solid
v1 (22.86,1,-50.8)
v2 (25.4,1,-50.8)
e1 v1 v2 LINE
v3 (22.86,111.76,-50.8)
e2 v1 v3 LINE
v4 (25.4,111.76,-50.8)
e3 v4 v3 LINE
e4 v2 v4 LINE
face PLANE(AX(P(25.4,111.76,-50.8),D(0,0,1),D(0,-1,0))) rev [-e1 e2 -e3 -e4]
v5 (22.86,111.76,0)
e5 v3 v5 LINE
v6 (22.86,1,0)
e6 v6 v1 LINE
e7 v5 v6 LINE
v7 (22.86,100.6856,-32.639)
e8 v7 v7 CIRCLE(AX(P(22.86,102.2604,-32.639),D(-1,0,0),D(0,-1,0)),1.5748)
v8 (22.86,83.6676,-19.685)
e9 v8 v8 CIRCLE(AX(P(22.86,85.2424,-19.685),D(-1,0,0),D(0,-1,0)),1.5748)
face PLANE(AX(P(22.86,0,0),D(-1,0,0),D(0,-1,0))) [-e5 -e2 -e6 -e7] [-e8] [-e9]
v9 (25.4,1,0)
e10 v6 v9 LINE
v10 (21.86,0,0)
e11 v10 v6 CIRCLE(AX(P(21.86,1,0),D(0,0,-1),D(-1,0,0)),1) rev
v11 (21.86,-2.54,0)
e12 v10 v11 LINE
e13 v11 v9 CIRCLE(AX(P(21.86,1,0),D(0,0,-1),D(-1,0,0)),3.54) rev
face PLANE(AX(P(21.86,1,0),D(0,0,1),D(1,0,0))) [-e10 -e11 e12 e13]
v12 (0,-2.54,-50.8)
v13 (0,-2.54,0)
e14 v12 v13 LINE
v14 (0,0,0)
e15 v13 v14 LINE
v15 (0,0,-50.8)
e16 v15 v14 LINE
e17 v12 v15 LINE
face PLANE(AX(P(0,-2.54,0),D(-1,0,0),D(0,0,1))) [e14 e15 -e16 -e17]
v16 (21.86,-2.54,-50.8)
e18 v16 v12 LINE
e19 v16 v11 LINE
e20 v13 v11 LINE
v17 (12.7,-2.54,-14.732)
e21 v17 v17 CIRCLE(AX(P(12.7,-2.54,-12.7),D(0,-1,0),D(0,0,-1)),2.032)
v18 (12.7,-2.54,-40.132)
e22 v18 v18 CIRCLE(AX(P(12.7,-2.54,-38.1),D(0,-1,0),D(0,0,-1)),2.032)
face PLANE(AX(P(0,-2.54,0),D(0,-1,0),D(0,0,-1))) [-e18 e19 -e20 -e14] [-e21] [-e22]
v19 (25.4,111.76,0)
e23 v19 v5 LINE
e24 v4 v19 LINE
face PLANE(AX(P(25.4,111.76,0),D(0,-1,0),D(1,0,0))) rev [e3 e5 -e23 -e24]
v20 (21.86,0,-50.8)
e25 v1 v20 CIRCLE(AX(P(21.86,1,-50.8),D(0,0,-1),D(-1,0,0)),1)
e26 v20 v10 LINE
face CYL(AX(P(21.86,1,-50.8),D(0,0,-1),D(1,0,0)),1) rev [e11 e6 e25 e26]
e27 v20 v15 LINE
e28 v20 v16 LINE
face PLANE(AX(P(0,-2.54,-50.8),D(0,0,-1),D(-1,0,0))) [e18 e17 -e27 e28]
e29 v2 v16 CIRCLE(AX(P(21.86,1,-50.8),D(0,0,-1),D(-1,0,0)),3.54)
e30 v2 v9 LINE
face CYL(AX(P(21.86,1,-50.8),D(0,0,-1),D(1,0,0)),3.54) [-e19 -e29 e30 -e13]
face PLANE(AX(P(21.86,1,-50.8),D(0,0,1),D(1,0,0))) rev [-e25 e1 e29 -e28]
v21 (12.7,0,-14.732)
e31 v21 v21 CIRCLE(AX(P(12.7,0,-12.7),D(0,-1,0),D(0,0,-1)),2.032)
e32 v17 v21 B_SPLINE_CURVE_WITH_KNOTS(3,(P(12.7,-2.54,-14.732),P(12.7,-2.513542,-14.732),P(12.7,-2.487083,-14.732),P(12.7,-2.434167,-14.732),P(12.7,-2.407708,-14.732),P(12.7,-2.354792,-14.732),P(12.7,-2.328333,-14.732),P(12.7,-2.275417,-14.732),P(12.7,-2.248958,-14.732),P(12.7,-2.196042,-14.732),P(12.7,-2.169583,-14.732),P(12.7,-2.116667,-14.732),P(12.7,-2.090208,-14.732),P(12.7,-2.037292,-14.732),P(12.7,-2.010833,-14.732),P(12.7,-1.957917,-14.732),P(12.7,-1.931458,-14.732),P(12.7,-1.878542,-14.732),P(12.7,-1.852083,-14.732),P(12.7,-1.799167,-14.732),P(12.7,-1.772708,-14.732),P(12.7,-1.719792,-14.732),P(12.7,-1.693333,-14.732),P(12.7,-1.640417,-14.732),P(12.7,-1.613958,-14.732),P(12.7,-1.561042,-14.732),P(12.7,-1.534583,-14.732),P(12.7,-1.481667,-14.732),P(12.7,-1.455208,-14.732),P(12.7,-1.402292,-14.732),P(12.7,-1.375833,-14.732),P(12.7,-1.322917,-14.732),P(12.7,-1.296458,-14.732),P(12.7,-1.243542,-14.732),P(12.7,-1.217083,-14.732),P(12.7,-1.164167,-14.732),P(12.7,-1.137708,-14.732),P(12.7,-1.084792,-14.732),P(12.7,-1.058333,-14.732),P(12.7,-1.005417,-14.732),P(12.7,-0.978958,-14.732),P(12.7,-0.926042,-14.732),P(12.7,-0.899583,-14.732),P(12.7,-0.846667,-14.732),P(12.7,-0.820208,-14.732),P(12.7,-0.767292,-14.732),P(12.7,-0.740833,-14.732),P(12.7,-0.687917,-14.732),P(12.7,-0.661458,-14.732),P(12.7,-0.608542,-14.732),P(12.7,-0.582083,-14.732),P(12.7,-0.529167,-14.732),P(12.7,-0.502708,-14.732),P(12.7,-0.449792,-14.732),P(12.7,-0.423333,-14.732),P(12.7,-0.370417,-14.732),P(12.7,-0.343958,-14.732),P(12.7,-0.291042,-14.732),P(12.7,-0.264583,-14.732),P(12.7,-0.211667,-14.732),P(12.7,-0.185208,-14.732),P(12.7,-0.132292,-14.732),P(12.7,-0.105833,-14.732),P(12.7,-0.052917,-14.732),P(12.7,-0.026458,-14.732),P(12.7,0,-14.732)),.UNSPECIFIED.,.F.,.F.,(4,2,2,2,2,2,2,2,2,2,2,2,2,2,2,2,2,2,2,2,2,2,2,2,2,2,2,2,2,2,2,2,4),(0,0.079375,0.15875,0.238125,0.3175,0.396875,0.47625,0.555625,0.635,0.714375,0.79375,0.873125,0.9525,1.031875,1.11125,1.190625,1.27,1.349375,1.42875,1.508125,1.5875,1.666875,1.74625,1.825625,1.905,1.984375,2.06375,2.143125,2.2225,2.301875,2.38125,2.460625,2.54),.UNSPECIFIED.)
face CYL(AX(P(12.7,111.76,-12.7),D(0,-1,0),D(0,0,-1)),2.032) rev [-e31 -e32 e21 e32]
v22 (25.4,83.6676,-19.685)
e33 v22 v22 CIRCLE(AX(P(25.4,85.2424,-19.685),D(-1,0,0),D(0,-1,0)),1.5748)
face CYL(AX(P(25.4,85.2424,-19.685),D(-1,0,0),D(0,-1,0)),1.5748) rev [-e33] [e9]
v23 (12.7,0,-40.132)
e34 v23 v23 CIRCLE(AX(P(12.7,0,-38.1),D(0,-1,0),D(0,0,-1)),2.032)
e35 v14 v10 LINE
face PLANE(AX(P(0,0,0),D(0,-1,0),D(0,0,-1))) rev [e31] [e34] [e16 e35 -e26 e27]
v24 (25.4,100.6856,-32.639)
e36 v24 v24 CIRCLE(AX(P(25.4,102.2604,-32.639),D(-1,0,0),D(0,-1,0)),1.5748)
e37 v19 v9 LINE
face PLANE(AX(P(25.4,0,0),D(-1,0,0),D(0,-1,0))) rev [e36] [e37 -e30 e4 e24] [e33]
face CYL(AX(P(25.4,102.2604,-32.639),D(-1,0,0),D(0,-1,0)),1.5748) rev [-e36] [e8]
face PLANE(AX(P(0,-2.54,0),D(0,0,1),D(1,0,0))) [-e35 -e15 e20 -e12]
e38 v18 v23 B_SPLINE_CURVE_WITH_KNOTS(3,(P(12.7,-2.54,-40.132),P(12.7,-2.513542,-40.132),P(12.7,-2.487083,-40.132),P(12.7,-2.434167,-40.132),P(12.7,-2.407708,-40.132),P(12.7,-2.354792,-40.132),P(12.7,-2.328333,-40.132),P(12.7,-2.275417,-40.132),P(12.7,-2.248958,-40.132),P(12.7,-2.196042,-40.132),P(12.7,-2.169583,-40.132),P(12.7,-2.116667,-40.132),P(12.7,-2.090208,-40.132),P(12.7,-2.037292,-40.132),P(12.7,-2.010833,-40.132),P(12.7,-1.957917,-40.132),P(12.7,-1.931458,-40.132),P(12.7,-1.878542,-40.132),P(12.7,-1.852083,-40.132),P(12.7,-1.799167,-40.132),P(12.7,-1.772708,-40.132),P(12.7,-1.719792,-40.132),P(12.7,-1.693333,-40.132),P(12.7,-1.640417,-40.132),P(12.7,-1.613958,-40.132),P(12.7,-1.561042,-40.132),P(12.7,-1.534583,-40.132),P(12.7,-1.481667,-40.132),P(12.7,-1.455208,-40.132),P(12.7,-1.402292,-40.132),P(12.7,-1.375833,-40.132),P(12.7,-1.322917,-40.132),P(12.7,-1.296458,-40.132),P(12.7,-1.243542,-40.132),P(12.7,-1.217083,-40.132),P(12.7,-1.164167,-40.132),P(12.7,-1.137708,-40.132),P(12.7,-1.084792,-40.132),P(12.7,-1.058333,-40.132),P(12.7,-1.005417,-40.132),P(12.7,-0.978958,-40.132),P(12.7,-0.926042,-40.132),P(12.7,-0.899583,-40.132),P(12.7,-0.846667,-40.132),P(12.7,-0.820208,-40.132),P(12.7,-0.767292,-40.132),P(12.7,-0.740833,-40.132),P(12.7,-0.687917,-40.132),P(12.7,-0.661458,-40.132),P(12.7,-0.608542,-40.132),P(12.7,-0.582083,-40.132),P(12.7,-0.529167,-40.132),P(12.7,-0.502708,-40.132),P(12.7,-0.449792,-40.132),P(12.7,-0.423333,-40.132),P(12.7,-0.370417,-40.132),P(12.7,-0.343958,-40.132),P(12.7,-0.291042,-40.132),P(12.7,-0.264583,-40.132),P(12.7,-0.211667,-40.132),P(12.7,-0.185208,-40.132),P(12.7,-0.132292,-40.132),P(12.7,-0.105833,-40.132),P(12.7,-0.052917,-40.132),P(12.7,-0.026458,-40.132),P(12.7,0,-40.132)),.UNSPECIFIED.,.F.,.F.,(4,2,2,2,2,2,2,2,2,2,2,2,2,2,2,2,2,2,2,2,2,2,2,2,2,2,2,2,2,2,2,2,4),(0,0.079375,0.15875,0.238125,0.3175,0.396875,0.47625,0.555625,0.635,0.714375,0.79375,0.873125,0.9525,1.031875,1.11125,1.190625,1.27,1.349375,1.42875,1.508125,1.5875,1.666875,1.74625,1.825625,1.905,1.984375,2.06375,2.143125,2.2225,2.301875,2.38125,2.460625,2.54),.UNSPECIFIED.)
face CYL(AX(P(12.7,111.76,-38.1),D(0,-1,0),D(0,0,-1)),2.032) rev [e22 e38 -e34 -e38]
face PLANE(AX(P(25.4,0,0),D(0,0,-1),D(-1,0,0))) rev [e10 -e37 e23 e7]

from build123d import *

# Parameters (mm, degrees)
SKETCH2_W                    = 25.4
SKETCH2_H                    = 50.8
BASE_FLANGE1_DEPTH           = 2.54
EDGE_FLANGE1_STRIP_W         = 12.16
EDGE_FLANGE1_STRIP_H         = 2.54
EDGE_FLANGE1_STRIP_CUT_DEPTH = 50.8
EDGE_FLANGE1_DEPTH           = 50.8
SKETCH10_R                   = 2.032
CUT_EXTRUDE1_DEPTH           = 128.633420388
SKETCH11_R                   = 1.5748
CUT_EXTRUDE2_DEPTH           = 125.874005301


# Sheet-metal steps are written as plain solids
with BuildPart() as part:
    # Sketch2 → Base-Flange1 (new body)
    with BuildSketch(Plane(origin=(0, 0, 0), x_dir=(1, 0, 0), z_dir=(0, 1, 0))):
        with Locations((12.7, 25.4)):
            Rectangle(SKETCH2_W, SKETCH2_H)
    extrude(amount=-BASE_FLANGE1_DEPTH)

    # Edge-Flange1 strip (across the edge) → Edge-Flange1 strip cut (cut)
    with BuildSketch(Plane(origin=(25.4, 0, 0), x_dir=(-1, 0, 0), z_dir=(0, 0, -1))):
        with Locations((-2.54, -1.27)):
            Rectangle(EDGE_FLANGE1_STRIP_W, EDGE_FLANGE1_STRIP_H)
    extrude(amount=EDGE_FLANGE1_STRIP_CUT_DEPTH, mode=Mode.SUBTRACT)

    # Edge-Flange1 section (across the edge) → Edge-Flange1 (add)
    with BuildSketch(Plane(origin=(25.4, 0, 0), x_dir=(-1, 0, 0), z_dir=(0, 0, -1))):
        with BuildLine():
            Line((0, 1), (0, 111.76))
            Line((0, 111.76), (2.54, 111.76))
            Line((2.54, 111.76), (2.54, 1))
            ThreePointArc((2.54, 1), (2.832893219, 0.292893219), (3.54, 0))
            Line((3.54, 0), (3.54, -2.54))
            ThreePointArc((3.54, -2.54), (1.036841995, -1.503158005), (0, 1))
        make_face()
    extrude(amount=EDGE_FLANGE1_DEPTH)

    # Sketch10 → Cut-Extrude1 (cut, through all)
    with BuildSketch(Plane.XZ.offset(2.54)):
        with Locations(Location((12.7, -38.1, 0), (0, 0, 270))):
            Circle(SKETCH10_R)
        with Locations(Location((12.7, -12.7, 0), (0, 0, 270))):
            Circle(SKETCH10_R)
    extrude(amount=-CUT_EXTRUDE1_DEPTH, mode=Mode.SUBTRACT)

    # Sketch11 → Cut-Extrude2 (cut, through all)
    with BuildSketch(Plane.ZY.offset(-22.86)):
        with Locations(Location((-32.639, 102.2604, 0), (0, 0, 270))):
            Circle(SKETCH11_R)
        with Locations(Location((-19.685, 85.2424, 0), (0, 0, 270))):
            Circle(SKETCH11_R)
    extrude(amount=-CUT_EXTRUDE2_DEPTH, mode=Mode.SUBTRACT)


solid = part.part
